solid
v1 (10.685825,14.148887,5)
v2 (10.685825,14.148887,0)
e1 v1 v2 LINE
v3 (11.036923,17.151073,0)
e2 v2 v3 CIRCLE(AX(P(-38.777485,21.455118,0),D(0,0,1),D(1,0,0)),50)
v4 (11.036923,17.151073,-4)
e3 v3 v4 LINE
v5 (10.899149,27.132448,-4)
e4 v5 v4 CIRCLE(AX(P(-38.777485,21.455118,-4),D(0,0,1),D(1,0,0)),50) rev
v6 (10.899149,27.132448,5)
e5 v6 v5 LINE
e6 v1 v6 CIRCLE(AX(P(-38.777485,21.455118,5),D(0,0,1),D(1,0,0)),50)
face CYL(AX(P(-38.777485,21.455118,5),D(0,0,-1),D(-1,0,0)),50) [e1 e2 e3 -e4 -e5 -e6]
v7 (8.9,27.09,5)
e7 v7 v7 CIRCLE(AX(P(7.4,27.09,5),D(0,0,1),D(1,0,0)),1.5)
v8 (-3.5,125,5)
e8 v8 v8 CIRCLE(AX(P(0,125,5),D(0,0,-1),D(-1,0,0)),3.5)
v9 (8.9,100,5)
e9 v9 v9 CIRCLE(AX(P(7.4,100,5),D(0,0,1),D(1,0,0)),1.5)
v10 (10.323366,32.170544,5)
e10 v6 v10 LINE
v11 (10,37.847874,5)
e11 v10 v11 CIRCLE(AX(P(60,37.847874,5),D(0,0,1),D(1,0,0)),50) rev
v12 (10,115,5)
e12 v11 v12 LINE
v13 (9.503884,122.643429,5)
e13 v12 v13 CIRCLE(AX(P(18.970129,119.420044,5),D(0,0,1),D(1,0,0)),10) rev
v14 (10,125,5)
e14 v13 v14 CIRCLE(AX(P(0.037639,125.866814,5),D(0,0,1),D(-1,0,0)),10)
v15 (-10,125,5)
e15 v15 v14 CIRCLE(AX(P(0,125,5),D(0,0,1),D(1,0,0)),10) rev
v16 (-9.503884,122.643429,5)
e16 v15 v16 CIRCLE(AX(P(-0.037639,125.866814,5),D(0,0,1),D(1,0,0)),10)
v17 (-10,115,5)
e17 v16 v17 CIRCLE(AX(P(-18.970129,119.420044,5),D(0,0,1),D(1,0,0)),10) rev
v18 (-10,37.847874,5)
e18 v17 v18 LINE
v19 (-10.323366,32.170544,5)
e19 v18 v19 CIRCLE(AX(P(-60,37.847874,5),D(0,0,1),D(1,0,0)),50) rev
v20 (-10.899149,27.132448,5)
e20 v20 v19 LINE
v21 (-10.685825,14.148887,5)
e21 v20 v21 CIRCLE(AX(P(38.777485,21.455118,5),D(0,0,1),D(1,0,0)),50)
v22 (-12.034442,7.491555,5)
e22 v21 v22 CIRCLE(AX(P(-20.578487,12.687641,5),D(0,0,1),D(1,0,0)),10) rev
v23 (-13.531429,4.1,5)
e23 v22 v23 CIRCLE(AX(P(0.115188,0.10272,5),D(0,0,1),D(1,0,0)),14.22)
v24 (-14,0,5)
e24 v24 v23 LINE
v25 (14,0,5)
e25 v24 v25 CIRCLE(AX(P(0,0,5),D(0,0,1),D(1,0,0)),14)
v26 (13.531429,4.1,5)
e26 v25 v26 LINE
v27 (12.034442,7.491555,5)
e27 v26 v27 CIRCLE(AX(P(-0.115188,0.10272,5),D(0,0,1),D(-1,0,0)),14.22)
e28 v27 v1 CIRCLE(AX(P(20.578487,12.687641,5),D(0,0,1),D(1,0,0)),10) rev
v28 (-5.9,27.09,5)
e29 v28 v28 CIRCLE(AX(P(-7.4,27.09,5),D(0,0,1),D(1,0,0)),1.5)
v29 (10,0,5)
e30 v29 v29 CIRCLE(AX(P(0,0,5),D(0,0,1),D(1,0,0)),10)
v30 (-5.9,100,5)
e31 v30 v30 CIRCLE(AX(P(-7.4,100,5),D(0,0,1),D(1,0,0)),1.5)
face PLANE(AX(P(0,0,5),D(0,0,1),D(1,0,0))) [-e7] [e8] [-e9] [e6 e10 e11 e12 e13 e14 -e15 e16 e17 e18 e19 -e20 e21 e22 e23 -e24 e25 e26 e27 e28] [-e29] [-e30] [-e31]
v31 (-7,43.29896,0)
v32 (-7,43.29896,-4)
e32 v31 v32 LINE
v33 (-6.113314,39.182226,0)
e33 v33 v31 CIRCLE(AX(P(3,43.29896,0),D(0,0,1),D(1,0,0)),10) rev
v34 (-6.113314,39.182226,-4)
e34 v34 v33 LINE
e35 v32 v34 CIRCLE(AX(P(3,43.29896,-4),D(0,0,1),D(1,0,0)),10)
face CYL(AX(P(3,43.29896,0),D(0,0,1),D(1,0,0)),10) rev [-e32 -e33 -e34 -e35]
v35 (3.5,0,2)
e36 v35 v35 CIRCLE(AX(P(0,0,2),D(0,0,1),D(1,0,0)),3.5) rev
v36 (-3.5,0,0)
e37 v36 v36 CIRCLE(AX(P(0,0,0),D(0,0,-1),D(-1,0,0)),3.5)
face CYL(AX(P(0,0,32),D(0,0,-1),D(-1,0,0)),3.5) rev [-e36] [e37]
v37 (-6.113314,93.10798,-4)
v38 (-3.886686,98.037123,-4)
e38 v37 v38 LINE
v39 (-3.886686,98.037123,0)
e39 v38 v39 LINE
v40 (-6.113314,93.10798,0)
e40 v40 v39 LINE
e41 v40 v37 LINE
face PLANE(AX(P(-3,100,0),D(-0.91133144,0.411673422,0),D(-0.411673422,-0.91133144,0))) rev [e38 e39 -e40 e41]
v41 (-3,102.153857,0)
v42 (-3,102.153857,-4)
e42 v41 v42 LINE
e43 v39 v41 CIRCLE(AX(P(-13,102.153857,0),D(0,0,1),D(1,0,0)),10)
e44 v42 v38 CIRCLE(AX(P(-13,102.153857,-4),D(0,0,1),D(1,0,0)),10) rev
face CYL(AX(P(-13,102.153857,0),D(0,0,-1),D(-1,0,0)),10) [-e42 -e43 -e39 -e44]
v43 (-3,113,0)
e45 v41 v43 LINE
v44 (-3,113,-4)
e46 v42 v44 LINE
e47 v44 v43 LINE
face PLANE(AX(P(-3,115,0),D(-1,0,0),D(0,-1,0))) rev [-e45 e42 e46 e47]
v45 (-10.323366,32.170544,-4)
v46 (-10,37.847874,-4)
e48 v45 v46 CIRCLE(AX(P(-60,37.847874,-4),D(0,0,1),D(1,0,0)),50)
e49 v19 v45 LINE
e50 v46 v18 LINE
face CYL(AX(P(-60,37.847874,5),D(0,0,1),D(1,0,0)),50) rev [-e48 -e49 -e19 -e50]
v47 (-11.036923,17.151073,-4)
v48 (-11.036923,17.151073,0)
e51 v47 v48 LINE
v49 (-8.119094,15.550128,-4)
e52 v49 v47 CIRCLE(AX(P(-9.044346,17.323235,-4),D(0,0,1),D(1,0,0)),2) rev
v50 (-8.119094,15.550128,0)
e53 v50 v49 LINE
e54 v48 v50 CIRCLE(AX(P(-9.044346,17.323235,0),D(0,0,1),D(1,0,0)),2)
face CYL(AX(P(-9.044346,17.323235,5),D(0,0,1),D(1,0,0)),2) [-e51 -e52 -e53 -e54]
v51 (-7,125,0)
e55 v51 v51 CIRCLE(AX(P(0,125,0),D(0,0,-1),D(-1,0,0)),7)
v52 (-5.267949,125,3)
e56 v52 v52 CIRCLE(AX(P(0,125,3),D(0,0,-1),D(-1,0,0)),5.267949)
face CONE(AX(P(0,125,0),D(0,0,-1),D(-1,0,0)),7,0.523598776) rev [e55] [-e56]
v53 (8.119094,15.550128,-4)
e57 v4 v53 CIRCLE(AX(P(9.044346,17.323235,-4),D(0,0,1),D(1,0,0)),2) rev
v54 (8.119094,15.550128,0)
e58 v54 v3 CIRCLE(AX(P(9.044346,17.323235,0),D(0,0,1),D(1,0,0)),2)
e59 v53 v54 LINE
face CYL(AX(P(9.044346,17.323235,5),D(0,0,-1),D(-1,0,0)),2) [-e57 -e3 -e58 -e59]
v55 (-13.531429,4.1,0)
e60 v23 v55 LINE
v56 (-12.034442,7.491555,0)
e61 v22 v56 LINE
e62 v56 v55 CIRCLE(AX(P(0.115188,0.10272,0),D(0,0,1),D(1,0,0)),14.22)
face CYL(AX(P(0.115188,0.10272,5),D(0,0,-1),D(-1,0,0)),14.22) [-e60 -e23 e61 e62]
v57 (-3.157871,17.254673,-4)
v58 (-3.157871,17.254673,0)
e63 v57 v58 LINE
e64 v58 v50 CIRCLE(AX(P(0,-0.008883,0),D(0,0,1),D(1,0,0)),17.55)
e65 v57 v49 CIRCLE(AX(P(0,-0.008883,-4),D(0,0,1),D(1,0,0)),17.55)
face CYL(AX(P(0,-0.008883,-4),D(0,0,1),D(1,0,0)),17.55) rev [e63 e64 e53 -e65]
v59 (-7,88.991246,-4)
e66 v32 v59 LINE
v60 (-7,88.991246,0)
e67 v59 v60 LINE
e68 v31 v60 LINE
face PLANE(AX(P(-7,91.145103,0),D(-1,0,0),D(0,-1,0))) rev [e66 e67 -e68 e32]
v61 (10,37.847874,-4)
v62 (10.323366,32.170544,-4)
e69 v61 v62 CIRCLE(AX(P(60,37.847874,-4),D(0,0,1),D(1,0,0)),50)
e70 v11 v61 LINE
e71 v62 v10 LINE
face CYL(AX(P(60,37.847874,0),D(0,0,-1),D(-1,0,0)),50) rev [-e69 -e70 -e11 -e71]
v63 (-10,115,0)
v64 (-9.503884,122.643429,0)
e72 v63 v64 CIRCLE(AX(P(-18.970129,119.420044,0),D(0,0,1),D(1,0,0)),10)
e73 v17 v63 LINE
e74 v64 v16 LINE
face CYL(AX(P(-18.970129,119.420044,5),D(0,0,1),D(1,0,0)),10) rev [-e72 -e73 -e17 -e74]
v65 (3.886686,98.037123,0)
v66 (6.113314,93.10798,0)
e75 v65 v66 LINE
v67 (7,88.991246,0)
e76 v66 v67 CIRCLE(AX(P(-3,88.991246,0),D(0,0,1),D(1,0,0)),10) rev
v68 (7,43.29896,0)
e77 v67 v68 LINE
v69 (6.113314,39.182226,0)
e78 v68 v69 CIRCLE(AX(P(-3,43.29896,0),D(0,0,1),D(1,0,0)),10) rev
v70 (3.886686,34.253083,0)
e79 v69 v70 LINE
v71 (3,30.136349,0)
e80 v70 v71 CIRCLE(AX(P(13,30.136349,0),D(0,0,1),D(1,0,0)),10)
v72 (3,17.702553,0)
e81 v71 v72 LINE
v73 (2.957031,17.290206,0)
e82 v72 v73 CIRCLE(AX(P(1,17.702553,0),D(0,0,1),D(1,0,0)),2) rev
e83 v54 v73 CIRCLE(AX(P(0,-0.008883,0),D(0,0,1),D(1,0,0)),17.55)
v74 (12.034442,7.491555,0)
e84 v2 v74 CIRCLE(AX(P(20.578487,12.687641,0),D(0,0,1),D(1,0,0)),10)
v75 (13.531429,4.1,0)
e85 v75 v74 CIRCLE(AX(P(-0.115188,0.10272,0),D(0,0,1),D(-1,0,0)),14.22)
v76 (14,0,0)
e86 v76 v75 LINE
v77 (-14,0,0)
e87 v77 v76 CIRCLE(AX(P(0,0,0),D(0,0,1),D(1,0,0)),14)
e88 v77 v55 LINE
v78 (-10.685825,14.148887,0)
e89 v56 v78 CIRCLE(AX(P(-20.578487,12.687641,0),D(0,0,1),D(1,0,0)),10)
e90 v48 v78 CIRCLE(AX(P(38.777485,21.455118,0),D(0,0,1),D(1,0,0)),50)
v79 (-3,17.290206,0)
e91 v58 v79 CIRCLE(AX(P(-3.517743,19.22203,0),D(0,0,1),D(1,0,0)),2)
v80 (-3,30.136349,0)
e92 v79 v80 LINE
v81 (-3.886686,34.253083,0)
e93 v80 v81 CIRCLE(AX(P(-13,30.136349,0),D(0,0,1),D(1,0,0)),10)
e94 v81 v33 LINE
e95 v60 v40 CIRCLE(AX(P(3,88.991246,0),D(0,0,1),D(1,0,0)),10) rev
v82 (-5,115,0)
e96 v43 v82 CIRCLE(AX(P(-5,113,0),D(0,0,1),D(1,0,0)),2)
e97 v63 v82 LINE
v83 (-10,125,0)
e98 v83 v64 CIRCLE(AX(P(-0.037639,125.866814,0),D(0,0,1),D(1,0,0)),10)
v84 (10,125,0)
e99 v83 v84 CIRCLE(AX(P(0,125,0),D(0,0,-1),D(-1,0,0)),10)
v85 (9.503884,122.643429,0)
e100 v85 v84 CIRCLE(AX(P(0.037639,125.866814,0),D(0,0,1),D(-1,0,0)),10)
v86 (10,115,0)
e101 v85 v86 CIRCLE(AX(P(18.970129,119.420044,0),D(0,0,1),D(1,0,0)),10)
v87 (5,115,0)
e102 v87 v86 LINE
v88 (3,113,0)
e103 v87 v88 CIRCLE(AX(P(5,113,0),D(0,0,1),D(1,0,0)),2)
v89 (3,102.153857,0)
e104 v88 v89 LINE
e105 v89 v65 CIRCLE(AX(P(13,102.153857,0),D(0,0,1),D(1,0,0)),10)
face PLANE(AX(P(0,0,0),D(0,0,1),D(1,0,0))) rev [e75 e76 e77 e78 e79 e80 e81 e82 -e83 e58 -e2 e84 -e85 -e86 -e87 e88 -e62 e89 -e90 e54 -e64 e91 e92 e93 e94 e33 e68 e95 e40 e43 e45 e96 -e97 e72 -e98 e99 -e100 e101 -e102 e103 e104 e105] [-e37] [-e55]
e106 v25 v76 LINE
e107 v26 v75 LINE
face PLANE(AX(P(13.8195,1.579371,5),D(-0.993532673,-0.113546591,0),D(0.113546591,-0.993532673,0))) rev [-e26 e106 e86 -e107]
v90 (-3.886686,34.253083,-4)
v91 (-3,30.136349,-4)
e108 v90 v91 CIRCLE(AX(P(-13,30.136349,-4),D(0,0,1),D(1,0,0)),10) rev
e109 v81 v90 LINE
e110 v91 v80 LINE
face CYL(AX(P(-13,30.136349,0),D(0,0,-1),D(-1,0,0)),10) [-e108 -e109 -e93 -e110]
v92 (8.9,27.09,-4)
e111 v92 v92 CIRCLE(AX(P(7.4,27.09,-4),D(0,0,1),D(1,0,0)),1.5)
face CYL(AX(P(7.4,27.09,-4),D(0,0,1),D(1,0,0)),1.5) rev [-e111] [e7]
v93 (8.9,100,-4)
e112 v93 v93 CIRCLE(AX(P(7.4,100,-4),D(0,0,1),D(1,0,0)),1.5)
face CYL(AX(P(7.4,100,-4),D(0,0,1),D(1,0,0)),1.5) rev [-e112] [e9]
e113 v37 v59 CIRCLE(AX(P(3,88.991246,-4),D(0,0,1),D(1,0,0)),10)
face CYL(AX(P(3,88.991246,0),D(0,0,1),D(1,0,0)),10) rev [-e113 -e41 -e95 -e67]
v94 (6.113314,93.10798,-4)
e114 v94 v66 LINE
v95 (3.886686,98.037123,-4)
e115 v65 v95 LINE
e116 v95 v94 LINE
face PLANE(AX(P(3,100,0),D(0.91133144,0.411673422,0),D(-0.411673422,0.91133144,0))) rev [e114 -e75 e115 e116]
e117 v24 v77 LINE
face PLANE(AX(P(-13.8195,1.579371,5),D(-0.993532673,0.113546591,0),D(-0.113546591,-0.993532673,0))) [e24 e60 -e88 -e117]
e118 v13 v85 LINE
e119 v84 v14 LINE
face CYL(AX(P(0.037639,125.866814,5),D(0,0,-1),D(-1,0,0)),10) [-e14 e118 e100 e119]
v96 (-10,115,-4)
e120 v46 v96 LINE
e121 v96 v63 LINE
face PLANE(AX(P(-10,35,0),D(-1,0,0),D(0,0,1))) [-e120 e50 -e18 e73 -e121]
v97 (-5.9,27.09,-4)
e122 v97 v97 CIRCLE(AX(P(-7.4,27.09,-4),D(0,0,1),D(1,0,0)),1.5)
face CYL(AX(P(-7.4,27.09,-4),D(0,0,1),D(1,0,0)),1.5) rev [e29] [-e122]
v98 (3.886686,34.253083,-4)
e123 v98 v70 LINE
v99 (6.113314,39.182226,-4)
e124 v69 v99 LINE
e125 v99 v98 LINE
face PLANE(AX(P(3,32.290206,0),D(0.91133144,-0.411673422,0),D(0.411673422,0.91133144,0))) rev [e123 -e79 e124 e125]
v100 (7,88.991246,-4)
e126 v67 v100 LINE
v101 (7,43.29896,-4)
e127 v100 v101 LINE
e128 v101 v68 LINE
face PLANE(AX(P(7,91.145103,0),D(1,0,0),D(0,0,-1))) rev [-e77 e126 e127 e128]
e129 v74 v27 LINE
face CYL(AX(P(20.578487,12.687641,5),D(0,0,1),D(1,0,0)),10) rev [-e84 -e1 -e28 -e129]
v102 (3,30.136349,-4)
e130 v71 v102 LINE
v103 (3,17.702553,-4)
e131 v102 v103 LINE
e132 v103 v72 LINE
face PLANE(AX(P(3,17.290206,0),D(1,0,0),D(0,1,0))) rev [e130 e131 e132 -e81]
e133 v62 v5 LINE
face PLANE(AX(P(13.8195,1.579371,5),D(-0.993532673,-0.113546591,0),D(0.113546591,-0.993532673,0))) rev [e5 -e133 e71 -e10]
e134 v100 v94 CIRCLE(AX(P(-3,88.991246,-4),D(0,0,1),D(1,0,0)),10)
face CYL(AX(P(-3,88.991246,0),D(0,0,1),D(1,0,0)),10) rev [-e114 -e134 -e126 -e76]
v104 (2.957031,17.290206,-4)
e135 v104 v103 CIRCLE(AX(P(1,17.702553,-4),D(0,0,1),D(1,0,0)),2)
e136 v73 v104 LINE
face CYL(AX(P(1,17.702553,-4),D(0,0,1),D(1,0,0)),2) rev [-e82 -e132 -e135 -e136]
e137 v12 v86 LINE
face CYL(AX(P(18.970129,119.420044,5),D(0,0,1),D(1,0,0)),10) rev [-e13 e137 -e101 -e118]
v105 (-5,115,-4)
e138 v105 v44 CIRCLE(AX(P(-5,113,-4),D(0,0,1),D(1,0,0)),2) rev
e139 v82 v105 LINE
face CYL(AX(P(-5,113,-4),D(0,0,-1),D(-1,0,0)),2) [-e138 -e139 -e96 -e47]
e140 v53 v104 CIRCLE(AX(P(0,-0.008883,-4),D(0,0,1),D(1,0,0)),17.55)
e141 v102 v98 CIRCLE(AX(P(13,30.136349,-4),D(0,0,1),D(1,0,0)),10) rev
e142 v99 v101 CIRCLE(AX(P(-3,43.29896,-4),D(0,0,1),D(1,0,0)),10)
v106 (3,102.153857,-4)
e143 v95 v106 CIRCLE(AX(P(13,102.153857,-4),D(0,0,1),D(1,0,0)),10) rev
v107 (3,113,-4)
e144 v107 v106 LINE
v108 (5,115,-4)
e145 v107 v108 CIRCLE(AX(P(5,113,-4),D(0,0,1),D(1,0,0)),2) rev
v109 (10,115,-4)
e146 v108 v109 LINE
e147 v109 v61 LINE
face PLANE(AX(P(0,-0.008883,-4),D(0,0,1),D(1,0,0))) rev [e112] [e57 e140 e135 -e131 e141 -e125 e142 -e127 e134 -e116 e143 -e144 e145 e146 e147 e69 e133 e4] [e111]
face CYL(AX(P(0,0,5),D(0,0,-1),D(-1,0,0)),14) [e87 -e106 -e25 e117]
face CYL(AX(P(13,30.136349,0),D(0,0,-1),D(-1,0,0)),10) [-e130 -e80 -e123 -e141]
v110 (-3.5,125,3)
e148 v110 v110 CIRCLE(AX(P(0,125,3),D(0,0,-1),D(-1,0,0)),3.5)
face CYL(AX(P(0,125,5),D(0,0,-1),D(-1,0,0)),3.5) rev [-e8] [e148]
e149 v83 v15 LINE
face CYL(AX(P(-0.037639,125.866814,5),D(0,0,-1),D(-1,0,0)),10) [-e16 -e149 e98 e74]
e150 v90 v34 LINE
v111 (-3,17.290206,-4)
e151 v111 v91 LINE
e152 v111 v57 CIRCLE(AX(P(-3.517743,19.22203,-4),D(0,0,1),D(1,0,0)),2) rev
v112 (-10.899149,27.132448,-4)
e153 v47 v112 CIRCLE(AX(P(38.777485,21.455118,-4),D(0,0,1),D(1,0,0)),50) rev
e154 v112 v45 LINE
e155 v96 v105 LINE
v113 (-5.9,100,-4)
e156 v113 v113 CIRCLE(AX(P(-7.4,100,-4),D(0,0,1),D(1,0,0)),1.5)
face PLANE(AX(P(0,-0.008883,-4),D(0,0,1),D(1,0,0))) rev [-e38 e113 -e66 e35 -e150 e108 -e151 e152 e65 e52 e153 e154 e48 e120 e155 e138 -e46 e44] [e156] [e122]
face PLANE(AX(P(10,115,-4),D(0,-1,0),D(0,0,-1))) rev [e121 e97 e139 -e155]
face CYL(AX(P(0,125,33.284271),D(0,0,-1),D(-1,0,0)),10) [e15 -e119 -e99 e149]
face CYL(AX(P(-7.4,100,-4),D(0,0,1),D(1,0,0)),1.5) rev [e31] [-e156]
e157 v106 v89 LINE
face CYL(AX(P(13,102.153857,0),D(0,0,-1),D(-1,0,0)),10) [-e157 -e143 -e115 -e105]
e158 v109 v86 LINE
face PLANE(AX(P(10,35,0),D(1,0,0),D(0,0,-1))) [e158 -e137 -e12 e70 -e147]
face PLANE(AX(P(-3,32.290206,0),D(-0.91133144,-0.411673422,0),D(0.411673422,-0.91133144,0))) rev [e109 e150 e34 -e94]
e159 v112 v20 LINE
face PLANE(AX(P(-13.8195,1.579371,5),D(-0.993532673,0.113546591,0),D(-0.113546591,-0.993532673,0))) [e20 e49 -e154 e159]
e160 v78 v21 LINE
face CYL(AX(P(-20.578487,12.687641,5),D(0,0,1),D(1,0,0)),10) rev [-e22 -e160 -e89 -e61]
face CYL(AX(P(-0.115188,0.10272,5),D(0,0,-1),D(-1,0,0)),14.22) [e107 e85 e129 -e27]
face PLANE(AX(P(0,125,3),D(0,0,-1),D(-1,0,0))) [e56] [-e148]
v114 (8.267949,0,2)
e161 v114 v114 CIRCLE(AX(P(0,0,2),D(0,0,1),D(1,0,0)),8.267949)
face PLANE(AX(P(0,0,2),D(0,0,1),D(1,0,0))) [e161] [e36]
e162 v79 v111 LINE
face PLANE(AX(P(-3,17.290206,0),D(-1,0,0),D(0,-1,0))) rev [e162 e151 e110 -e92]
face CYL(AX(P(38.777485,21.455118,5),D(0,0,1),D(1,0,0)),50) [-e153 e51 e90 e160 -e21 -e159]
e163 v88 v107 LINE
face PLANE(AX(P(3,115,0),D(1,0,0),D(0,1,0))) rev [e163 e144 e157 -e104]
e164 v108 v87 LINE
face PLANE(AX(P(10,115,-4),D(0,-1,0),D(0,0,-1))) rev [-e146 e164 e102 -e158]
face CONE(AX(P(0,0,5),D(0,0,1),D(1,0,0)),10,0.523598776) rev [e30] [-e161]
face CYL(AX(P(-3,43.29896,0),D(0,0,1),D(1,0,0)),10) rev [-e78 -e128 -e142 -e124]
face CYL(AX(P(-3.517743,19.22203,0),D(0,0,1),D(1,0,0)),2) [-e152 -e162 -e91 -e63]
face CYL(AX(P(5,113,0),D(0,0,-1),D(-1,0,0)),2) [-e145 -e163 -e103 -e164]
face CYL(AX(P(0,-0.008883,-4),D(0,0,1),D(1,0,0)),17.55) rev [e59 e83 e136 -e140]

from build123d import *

# Parameters (mm, degrees)
BOSS_EXTRUDE1_DEPTH = 5
SKETCH2_W           = 20
SKETCH2_H           = 90.00000000000001
BOSS_EXTRUDE2_DEPTH = 5
CUT_EXTRUDE1_DEPTH  = 5
BOSS_EXTRUDE3_DEPTH = 4
SKETCH5_R           = 3.4999999999999996
CUT_EXTRUDE2_DEPTH  = 32
SKETCH6_R           = 10
CUT_EXTRUDE3_DEPTH  = 3
CUT_EXTRUDE3_DRAFT  = -30.000000000000068
SKETCH7_R           = 1.5
SKETCH7_R_2         = 1.5000000000000018
SKETCH7_R_3         = 1.5000000000000009
CUT_EXTRUDE4_DEPTH  = 127.10313239567049
CUT_EXTRUDE5_DEPTH  = 4
FILLET1_R           = 10
FILLET2_R           = 2
FILLET3_R           = 50
FILLET4_DEPTH       = 5
FILLET4_START       = -4
FILLET4_2_DEPTH     = 4.5281
FILLET5_R           = 2
SKETCH9_R           = 10.000000000000004
BOSS_EXTRUDE4_DEPTH = 5
CUT_EXTRUDE6_DEPTH  = 136.81605207043827
FILLET6_R           = 10
SKETCH12_R          = 7.000000000000002
CUT_EXTRUDE7_DEPTH  = 3
CUT_EXTRUDE7_DRAFT  = -30.000000000000068
SKETCH13_R          = 3.500000000000001
CUT_EXTRUDE8_DEPTH  = 136.90437814875574


with BuildPart() as part:
    # Sketch1 → Boss-Extrude1 (new body)
    with BuildSketch(Plane.XY):
        with BuildLine():
            Line((-10, 35), (-14, 0))
            ThreePointArc((-14.000000000000004, 0), (5.36e-15, -14.000000000000002), (14.000000000000007, 5.39e-15))
            Line((14, 0), (13.639000805801773, 3.1587429492344796))
            Line((13.639000805801773, 3.1587429492344796), (10, 35))
            Line((10, 35), (-10, 35))
        make_face()
    extrude(amount=BOSS_EXTRUDE1_DEPTH)

    # Sketch2 → Boss-Extrude2 (add)
    with BuildSketch(Plane.XY.offset(5)):
        with Locations((-8.9e-16, 80)):
            Rectangle(SKETCH2_W, SKETCH2_H)
    extrude(amount=-BOSS_EXTRUDE2_DEPTH)

    # Sketch3 → Cut-Extrude1 (cut)
    with BuildSketch(Plane(origin=(0, 0, 0), x_dir=(-1, 0, 0), z_dir=(0, 0, -1))):
        with BuildLine():
            Line((-13.531428571428568, 4.1), (-11.714285714285717, 20.000000000000004))
            Line((-11.714285714285717, 20.000000000000004), (-10, 10.097287013661564))
            ThreePointArc((-10, 10.097287013661564), (-12.138289126679721, 7.318029611811854), (-13.531428571428568, 4.1))
        make_face()
        with BuildLine():
            Line((11.714285714285717, 20.000000000000004), (10, 10.097287013661564))
            ThreePointArc((10, 10.097287013661564), (12.13828912667972, 7.318029611811857), (13.531428571428568, 4.1))
            Line((13.531428571428568, 4.1), (11.714285714285717, 20.000000000000004))
        make_face()
    extrude(amount=-CUT_EXTRUDE1_DEPTH, mode=Mode.SUBTRACT)

    # Sketch4 → Boss-Extrude3 (add)
    with BuildSketch(Plane(origin=(0, 0, 0), x_dir=(-1, 0, 0), z_dir=(0, 0, -1))):
        with BuildLine():
            Line((11.714285714285715, 20.000000000000007), (10.663491421845874, 13.93))
            ThreePointArc((10.663491421845874, 13.93), (1.07e-15, 17.541117308183576), (-10.663491421845876, 13.93))
            Line((-10.663491421845876, 13.93), (-11.714285714285717, 20.000000000000004))
            Line((-11.714285714285717, 20.000000000000004), (-10, 35))
            Line((-10, 35), (-9.999999999999998, 115))
            Line((-9.999999999999998, 115), (9.999999999999986, 115))
            Line((9.999999999999986, 115), (10.000000000000002, 35))
            Line((10.000000000000002, 35), (11.714285714285715, 20.000000000000007))
        make_face()
    extrude(amount=BOSS_EXTRUDE3_DEPTH)

    # Sketch5 → Cut-Extrude2 (cut)
    with BuildSketch(Plane(origin=(0, 0, 0), x_dir=(-1, 0, 0), z_dir=(0, 0, -1))):
        Circle(SKETCH5_R)
    extrude(amount=-CUT_EXTRUDE2_DEPTH, mode=Mode.SUBTRACT)


with BuildPart() as cut_extrude3_tool:
    # Sketch6 → Cut-Extrude3 (with draft: the straight prism first)
    with BuildSketch(Plane.XY.offset(5)):
        Circle(SKETCH6_R)
    extrude(amount=-CUT_EXTRUDE3_DEPTH)
    # Cut-Extrude3: the draft: its side faces are tilted about the plane it starts from
    cut_extrude3_sides = [cut_extrude3_tool.faces().sort_by_distance(p)[0] for p in [
        (-10, 0, 3.5),
    ]]
    draft(cut_extrude3_sides, Plane.XY.offset(5), CUT_EXTRUDE3_DRAFT)


with BuildPart() as part_1:
    add(part.part)

    # Cut-Extrude3: cut by cut_extrude3_tool
    add(cut_extrude3_tool.part, mode=Mode.SUBTRACT)

    # Sketch7 → Cut-Extrude4 (cut, through all)
    with BuildSketch(Plane.XY.offset(5)):
        with Locations((-7.40000000000001, 27.090000000000003)):
            Circle(SKETCH7_R)
        with Locations((7.40000000000001, 27.090000000000003)):
            Circle(SKETCH7_R_2)
        with Locations((-7.4, 100)):
            Circle(SKETCH7_R)
        with Locations((7.4, 100)):
            Circle(SKETCH7_R_3)
    extrude(amount=-CUT_EXTRUDE4_DEPTH, mode=Mode.SUBTRACT)

    # Sketch8 → Cut-Extrude5 (cut)
    with BuildSketch(Plane(origin=(0, 0, -4), x_dir=(-1, 0, 0), z_dir=(0, 0, -1))):
        Polygon((3.0000000000000036, 115), (-3, 115), (-2.999999999999998, 100), (-6.999999999999996, 91.14510297951342), (-6.999999999999996, 41.14510297951343), (-2.999999999999998, 32.29020595902685), (-3, 17.290205959026846), (3.000000000000001, 17.290205959026846), (2.9999999999999987, 32.29020595902685), (6.999999999999997, 41.14510297951343), (6.999999999999999, 91.14510297951342), (3.0000000000000004, 100), align=None)
    extrude(amount=-CUT_EXTRUDE5_DEPTH, mode=Mode.SUBTRACT)

    # Fillet1
    fillet1_edges = [part_1.edges().sort_by_distance(p)[0] for p in [
        (2.999999999999998, 32.29020595902685, -2),
        (6.999999999999996, 41.14510297951343, -2),
        (6.999999999999996, 91.14510297951342, -2),
        (2.999999999999998, 100, -2),
        (-3.0000000000000004, 100, -2),
        (-6.999999999999999, 91.14510297951342, -2),
        (-6.999999999999997, 41.14510297951343, -2),
        (-2.9999999999999987, 32.29020595902685, -2),
    ]]
    fillet(fillet1_edges, radius=FILLET1_R)

    # Fillet2
    # the kernel refuses this fillet: 2 mm, written as the material it adds along each edge
    with BuildSketch(Plane(origin=(3, 17.290205959026846, -4), x_dir=(0, 1, 0), z_dir=(0, 0, 1))) as fillet2_piece_1:
        with BuildLine():
            CenterArc((0.4123469241082738, 2), FILLET2_R, 258.1017989738068, 11.898201026193192)
            Line((-3.55e-15, 0.0429690819564339), (0, 0))
            Line((0, 0), (0.4123469241082738, 0))
        make_face()
    extrude(amount=5.0308673102706845)
    # the kernel refuses this fillet: 2 mm, written as the material it takes off along each edge
    with BuildSketch(Plane(origin=(-2.957030918043564, 17.290205959026842, -4.509899036073291), x_dir=(-0.9847073408131305, -0.17421668389891107, 0), z_dir=(0, 0, 1))) as fillet2_2_piece_1:
        with BuildLine():
            CenterArc((0.21558124488116945, -1.9999662341413758), FILLET2_R, 90.33293706162901, 4.637092426226772)
            Line((0.04231197043050394, -0.00748593096863449), (0, 0))
            ThreePointArc((0, 0), (0.10197980721465859, -0.00029629540941332), (0.20395961442931643, 0))
        make_face()
    extrude(amount=4.509899036073291, mode=Mode.SUBTRACT)
    with BuildSketch(Plane(origin=(-3.0000000000000036, 115, -9), x_dir=(0, -1, 0), z_dir=(0, 0, 1))) as fillet2_2_piece_2:
        with BuildLine():
            CenterArc((FILLET2_R, -FILLET2_R), FILLET2_R, 90, 89.99999999999994)
            Line((0, -FILLET2_R), (0, 0))
            Line((0, 0), (FILLET2_R, 0))
        make_face()
    extrude(amount=9, mode=Mode.SUBTRACT)
    with BuildSketch(Plane(origin=(3, 115, -9), x_dir=(1, 0, 0), z_dir=(0, 0, 1))) as fillet2_2_piece_3:
        with BuildLine():
            CenterArc((FILLET2_R, -FILLET2_R), FILLET2_R, 90, 90)
            Line((0, -FILLET2_R), (0, 0))
            Line((0, 0), (FILLET2_R, 0))
        make_face()
    extrude(amount=9, mode=Mode.SUBTRACT)

    # Fillet3
    fillet3_edges = [part_1.edges().sort_by_distance(p)[0] for p in [
        (10, 35, 0.5),
        (-10, 35, 0.5),
        (-11.714285714285715, 20.000000000000007, 0.5),
        (11.714285714285717, 20.000000000000004, 0.5),
    ]]
    fillet(fillet3_edges, radius=FILLET3_R)

    # Fillet4: read off the stored shape, not the designer's step
    # Fillet4 outline → Fillet4 (add)
    with BuildSketch(Plane.XY):
        with BuildLine():
            ThreePointArc((-12.034442383, 7.491554566), (-11.093201481, 8.85374289), (-10, 10.097287014))
            Line((-10, 10.097287014), (-10.489743981, 12.926333563))
            ThreePointArc((-10.489743981, 12.926333563), (-10.591568808, 13.537003207), (-10.685824653, 14.148886811))
            ThreePointArc((-10.685824653, 14.148886811), (-10.777565635, 10.702206243), (-12.034442383, 7.491554566))
        make_face()
        with BuildLine():
            ThreePointArc((10.685824653, 14.148886811), (10.591568808, 13.537003207), (10.489743981, 12.926333563))
            Line((10.489743981, 12.926333563), (10, 10.097287014))
            ThreePointArc((10, 10.097287014), (11.093201481, 8.85374289), (12.034442383, 7.491554566))
            ThreePointArc((12.034442383, 7.491554566), (10.777565635, 10.702206243), (10.685824653, 14.148886811))
        make_face()
    extrude(amount=FILLET4_DEPTH)

    # Fillet4 2 outline → Fillet4 2 (add)
    with BuildSketch(Plane.XY.offset(FILLET4_START)):
        with BuildLine():
            ThreePointArc((-10.685824653, 14.148886811), (-10.670645953, 14.042149596), (-10.656618864, 13.935254943))
            ThreePointArc((-10.656618864, 13.935254943), (-10.655355047, 13.936220708), (-10.654091142, 13.937186359))
            ThreePointArc((-10.654091142, 13.937186359), (-10.670071192, 14.043019602), (-10.685824653, 14.148886811))
        make_face()
        with BuildLine():
            ThreePointArc((10.656618864, 13.935254943), (10.670645953, 14.042149596), (10.685824653, 14.148886811))
            ThreePointArc((10.685824653, 14.148886811), (10.670071192, 14.043019602), (10.654091141, 13.937186358))
            ThreePointArc((10.654091141, 13.937186358), (10.655355047, 13.936220708), (10.656618864, 13.935254943))
        make_face()
    extrude(amount=FILLET4_2_DEPTH)

    # Fillet5
    # the kernel refuses this fillet: 2 mm, written as the material it takes off along each edge
    with BuildSketch(Plane(origin=(-10.656618864, 13.935254943, -12.09556862181672), x_dir=(0.8436487743277257, 0.5368954698778211, 0), z_dir=(0, 0, 1))) as fillet5_piece_1:
        with BuildLine():
            CenterArc((3.1791827490453266, 1.9926433067767657), FILLET5_R, 152.46563486341088, 112.61853158765763)
            Line((1.4057153013326045, 2.9172043982700875), (1.2283685565613318, 3.0096605074194187))
            ThreePointArc((1.2283685565613318, 3.0096605074194187), (-0.09255081820002803, 0.2774816540598466), (-0.1808082004145864, 0.08548914938656571))
            Line((-0.1808082004145864, 0.08548914938656571), (0.01713850646766271, -0.19926432594937338))
            ThreePointArc((0.01713850646766271, -0.19926432594937338), (0.02027181051916814, -0.198995120599251), (2.990659782622436, -0.1992643306776759))
            Line((2.990659782622436, -0.1992643306776759), (3.0077982341154264, -1.7e-16))
        make_face()
    extrude(amount=12.09556862181672, mode=Mode.SUBTRACT)
    with BuildSketch(Plane(origin=(10.656618863999999, 13.935254943, -12.095568621816739), x_dir=(-0.8436487743277254, 0.5368954698778213, 0), z_dir=(0, 0, 1))) as fillet5_piece_2:
        with BuildLine():
            CenterArc((3.179182749045327, -1.9926433067767648), FILLET5_R, 94.91583354893154, 112.61853158765777)
            Line((1.4057153013326076, -2.9172043982700937), (1.228368556561337, -3.009660507419428))
            ThreePointArc((1.228368556561337, -3.009660507419428), (-0.09255081820002496, -0.2774816540598447), (-0.18080820041458637, -0.08548914938656577))
            Line((-0.18080820041458637, -0.08548914938656577), (0.01713859427019769, 0.19926431839755343))
            ThreePointArc((0.01713859427019769, 0.19926431839755343), (0.02027181051918035, 0.19899512059924826), (2.9906597826224344, 0.199264330677676))
            Line((2.9906597826224344, 0.199264330677676), (3.007798234115425, 9e-17))
        make_face()
    extrude(amount=12.095568621816739, mode=Mode.SUBTRACT)

    # Sketch9 → Boss-Extrude4 (add)
    with BuildSketch(Plane(origin=(0, 0, 0), x_dir=(-1, 0, 0), z_dir=(0, 0, -1))):
        with Locations((1.73e-15, 125)):
            Circle(SKETCH9_R)
    extrude(amount=-BOSS_EXTRUDE4_DEPTH)

    # Sketch11 → Cut-Extrude6 (cut, through all)
    with BuildSketch(Plane(origin=(0, 0, 0), x_dir=(-1, 0, 0), z_dir=(0, 0, -1))):
        with BuildLine():
            Line((-9.999999999999998, 115), (-10.000000000000002, 125))
            ThreePointArc((-10.000000000000002, 125), (-9.21839383454114, 121.90275741168345), (-7.499999999999998, 119.21000000000001))
            Line((-7.499999999999998, 119.21000000000001), (-9.999999999999998, 115))
        make_face()
        with BuildLine():
            Line((10.000000000000002, 115), (7.5000000000000036, 119.21000000000001))
            ThreePointArc((7.5000000000000036, 119.21000000000001), (9.218393834541143, 121.90275741168345), (10.000000000000005, 125))
            Line((10.000000000000005, 125), (10.000000000000002, 115))
        make_face()
    extrude(amount=-CUT_EXTRUDE6_DEPTH, mode=Mode.SUBTRACT)

    # Fillet6
    # the kernel refuses this fillet: 10 mm, written as the material it adds along each edge
    with BuildSketch(Plane(origin=(7.499999999999999, 119.21000000000001, 0), x_dir=(0.5105859411129599, -0.859826724833436, 0), z_dir=(0, 0, 1))) as fillet6_piece_1:
        with BuildLine():
            CenterArc((5.675884841968563, 9.96956882778365), FILLET6_R, 220.4927276915396, 45.036246603568316)
            Line((-1.928999069434184, 3.476053547591599), (-2.081096747662235, 3.3461832419877546))
            ThreePointArc((-2.081096747662235, 3.3461832419877546), (-0.9649011887903164, 1.7378038801254725), (-0.19067765961673533, -0.06034923465201128))
            Line((-0.19067765961673533, -0.06034923465201128), (-8.127e-14, -0.19999999999999948))
            ThreePointArc((-8.127e-14, -0.19999999999999948), (2.4481676821655842, -0.2000000000009927), (4.88074437477858, -0.19939137655567607))
            Line((4.88074437477858, -0.19939137655567607), (4.89633536433132, 7e-17))
        make_face()
    extrude(amount=5)
    with BuildSketch(Plane(origin=(-7.500000000000004, 119.21000000000001, 0), x_dir=(-0.510585941112954, -0.8598267248334394, 0), z_dir=(0, 0, 1))) as fillet6_piece_2:
        with BuildLine():
            CenterArc((5.675884841968524, -9.969568827783654), FILLET6_R, 94.47102570489186, 45.036246603568216)
            Line((-1.928999069434189, -3.4760535475915604), (-2.081096747662239, -3.3461832419877147))
            ThreePointArc((-2.081096747662239, -3.3461832419877147), (-0.9649011887903213, -1.7378038801254492), (-0.19067765961673488, 0.06034923465201256))
            Line((-0.19067765961673488, 0.06034923465201256), (-7.992e-14, 0.19999999999999946))
            ThreePointArc((-7.992e-14, 0.19999999999999946), (2.448167682165587, 0.20000000000097304), (4.880744374778577, 0.19939137655567624))
            Line((4.880744374778577, 0.19939137655567624), (4.896335364331317, 1.8e-16))
        make_face()
    extrude(amount=5)


with BuildPart() as cut_extrude7_tool:
    # Sketch12 → Cut-Extrude7 (with draft: the straight prism first)
    with BuildSketch(Plane(origin=(0, 0, 0), x_dir=(-1, 0, 0), z_dir=(0, 0, -1))):
        with Locations((1.73e-15, 125)):
            Circle(SKETCH12_R)
    extrude(amount=-CUT_EXTRUDE7_DEPTH)
    # Cut-Extrude7: the draft: its side faces are tilted about the plane it starts from
    cut_extrude7_sides = [cut_extrude7_tool.faces().sort_by_distance(p)[0] for p in [
        (7, 125, 1.5),
    ]]
    draft(cut_extrude7_sides, Plane(origin=(0, 0, 0), x_dir=(-1, 0, 0), z_dir=(0, 0, -1)), CUT_EXTRUDE7_DRAFT)


with BuildPart() as part_2:
    add(part_1.part)

    # Cut-Extrude7: cut by cut_extrude7_tool
    add(cut_extrude7_tool.part, mode=Mode.SUBTRACT)

    # Sketch13 → Cut-Extrude8 (cut, through all)
    with BuildSketch(Plane(origin=(0, 0, 3), x_dir=(-1, 0, 0), z_dir=(0, 0, -1))):
        with Locations((1.73e-15, 125)):
            Circle(SKETCH13_R)
    extrude(amount=-CUT_EXTRUDE8_DEPTH, mode=Mode.SUBTRACT)


solid = part_2.part
